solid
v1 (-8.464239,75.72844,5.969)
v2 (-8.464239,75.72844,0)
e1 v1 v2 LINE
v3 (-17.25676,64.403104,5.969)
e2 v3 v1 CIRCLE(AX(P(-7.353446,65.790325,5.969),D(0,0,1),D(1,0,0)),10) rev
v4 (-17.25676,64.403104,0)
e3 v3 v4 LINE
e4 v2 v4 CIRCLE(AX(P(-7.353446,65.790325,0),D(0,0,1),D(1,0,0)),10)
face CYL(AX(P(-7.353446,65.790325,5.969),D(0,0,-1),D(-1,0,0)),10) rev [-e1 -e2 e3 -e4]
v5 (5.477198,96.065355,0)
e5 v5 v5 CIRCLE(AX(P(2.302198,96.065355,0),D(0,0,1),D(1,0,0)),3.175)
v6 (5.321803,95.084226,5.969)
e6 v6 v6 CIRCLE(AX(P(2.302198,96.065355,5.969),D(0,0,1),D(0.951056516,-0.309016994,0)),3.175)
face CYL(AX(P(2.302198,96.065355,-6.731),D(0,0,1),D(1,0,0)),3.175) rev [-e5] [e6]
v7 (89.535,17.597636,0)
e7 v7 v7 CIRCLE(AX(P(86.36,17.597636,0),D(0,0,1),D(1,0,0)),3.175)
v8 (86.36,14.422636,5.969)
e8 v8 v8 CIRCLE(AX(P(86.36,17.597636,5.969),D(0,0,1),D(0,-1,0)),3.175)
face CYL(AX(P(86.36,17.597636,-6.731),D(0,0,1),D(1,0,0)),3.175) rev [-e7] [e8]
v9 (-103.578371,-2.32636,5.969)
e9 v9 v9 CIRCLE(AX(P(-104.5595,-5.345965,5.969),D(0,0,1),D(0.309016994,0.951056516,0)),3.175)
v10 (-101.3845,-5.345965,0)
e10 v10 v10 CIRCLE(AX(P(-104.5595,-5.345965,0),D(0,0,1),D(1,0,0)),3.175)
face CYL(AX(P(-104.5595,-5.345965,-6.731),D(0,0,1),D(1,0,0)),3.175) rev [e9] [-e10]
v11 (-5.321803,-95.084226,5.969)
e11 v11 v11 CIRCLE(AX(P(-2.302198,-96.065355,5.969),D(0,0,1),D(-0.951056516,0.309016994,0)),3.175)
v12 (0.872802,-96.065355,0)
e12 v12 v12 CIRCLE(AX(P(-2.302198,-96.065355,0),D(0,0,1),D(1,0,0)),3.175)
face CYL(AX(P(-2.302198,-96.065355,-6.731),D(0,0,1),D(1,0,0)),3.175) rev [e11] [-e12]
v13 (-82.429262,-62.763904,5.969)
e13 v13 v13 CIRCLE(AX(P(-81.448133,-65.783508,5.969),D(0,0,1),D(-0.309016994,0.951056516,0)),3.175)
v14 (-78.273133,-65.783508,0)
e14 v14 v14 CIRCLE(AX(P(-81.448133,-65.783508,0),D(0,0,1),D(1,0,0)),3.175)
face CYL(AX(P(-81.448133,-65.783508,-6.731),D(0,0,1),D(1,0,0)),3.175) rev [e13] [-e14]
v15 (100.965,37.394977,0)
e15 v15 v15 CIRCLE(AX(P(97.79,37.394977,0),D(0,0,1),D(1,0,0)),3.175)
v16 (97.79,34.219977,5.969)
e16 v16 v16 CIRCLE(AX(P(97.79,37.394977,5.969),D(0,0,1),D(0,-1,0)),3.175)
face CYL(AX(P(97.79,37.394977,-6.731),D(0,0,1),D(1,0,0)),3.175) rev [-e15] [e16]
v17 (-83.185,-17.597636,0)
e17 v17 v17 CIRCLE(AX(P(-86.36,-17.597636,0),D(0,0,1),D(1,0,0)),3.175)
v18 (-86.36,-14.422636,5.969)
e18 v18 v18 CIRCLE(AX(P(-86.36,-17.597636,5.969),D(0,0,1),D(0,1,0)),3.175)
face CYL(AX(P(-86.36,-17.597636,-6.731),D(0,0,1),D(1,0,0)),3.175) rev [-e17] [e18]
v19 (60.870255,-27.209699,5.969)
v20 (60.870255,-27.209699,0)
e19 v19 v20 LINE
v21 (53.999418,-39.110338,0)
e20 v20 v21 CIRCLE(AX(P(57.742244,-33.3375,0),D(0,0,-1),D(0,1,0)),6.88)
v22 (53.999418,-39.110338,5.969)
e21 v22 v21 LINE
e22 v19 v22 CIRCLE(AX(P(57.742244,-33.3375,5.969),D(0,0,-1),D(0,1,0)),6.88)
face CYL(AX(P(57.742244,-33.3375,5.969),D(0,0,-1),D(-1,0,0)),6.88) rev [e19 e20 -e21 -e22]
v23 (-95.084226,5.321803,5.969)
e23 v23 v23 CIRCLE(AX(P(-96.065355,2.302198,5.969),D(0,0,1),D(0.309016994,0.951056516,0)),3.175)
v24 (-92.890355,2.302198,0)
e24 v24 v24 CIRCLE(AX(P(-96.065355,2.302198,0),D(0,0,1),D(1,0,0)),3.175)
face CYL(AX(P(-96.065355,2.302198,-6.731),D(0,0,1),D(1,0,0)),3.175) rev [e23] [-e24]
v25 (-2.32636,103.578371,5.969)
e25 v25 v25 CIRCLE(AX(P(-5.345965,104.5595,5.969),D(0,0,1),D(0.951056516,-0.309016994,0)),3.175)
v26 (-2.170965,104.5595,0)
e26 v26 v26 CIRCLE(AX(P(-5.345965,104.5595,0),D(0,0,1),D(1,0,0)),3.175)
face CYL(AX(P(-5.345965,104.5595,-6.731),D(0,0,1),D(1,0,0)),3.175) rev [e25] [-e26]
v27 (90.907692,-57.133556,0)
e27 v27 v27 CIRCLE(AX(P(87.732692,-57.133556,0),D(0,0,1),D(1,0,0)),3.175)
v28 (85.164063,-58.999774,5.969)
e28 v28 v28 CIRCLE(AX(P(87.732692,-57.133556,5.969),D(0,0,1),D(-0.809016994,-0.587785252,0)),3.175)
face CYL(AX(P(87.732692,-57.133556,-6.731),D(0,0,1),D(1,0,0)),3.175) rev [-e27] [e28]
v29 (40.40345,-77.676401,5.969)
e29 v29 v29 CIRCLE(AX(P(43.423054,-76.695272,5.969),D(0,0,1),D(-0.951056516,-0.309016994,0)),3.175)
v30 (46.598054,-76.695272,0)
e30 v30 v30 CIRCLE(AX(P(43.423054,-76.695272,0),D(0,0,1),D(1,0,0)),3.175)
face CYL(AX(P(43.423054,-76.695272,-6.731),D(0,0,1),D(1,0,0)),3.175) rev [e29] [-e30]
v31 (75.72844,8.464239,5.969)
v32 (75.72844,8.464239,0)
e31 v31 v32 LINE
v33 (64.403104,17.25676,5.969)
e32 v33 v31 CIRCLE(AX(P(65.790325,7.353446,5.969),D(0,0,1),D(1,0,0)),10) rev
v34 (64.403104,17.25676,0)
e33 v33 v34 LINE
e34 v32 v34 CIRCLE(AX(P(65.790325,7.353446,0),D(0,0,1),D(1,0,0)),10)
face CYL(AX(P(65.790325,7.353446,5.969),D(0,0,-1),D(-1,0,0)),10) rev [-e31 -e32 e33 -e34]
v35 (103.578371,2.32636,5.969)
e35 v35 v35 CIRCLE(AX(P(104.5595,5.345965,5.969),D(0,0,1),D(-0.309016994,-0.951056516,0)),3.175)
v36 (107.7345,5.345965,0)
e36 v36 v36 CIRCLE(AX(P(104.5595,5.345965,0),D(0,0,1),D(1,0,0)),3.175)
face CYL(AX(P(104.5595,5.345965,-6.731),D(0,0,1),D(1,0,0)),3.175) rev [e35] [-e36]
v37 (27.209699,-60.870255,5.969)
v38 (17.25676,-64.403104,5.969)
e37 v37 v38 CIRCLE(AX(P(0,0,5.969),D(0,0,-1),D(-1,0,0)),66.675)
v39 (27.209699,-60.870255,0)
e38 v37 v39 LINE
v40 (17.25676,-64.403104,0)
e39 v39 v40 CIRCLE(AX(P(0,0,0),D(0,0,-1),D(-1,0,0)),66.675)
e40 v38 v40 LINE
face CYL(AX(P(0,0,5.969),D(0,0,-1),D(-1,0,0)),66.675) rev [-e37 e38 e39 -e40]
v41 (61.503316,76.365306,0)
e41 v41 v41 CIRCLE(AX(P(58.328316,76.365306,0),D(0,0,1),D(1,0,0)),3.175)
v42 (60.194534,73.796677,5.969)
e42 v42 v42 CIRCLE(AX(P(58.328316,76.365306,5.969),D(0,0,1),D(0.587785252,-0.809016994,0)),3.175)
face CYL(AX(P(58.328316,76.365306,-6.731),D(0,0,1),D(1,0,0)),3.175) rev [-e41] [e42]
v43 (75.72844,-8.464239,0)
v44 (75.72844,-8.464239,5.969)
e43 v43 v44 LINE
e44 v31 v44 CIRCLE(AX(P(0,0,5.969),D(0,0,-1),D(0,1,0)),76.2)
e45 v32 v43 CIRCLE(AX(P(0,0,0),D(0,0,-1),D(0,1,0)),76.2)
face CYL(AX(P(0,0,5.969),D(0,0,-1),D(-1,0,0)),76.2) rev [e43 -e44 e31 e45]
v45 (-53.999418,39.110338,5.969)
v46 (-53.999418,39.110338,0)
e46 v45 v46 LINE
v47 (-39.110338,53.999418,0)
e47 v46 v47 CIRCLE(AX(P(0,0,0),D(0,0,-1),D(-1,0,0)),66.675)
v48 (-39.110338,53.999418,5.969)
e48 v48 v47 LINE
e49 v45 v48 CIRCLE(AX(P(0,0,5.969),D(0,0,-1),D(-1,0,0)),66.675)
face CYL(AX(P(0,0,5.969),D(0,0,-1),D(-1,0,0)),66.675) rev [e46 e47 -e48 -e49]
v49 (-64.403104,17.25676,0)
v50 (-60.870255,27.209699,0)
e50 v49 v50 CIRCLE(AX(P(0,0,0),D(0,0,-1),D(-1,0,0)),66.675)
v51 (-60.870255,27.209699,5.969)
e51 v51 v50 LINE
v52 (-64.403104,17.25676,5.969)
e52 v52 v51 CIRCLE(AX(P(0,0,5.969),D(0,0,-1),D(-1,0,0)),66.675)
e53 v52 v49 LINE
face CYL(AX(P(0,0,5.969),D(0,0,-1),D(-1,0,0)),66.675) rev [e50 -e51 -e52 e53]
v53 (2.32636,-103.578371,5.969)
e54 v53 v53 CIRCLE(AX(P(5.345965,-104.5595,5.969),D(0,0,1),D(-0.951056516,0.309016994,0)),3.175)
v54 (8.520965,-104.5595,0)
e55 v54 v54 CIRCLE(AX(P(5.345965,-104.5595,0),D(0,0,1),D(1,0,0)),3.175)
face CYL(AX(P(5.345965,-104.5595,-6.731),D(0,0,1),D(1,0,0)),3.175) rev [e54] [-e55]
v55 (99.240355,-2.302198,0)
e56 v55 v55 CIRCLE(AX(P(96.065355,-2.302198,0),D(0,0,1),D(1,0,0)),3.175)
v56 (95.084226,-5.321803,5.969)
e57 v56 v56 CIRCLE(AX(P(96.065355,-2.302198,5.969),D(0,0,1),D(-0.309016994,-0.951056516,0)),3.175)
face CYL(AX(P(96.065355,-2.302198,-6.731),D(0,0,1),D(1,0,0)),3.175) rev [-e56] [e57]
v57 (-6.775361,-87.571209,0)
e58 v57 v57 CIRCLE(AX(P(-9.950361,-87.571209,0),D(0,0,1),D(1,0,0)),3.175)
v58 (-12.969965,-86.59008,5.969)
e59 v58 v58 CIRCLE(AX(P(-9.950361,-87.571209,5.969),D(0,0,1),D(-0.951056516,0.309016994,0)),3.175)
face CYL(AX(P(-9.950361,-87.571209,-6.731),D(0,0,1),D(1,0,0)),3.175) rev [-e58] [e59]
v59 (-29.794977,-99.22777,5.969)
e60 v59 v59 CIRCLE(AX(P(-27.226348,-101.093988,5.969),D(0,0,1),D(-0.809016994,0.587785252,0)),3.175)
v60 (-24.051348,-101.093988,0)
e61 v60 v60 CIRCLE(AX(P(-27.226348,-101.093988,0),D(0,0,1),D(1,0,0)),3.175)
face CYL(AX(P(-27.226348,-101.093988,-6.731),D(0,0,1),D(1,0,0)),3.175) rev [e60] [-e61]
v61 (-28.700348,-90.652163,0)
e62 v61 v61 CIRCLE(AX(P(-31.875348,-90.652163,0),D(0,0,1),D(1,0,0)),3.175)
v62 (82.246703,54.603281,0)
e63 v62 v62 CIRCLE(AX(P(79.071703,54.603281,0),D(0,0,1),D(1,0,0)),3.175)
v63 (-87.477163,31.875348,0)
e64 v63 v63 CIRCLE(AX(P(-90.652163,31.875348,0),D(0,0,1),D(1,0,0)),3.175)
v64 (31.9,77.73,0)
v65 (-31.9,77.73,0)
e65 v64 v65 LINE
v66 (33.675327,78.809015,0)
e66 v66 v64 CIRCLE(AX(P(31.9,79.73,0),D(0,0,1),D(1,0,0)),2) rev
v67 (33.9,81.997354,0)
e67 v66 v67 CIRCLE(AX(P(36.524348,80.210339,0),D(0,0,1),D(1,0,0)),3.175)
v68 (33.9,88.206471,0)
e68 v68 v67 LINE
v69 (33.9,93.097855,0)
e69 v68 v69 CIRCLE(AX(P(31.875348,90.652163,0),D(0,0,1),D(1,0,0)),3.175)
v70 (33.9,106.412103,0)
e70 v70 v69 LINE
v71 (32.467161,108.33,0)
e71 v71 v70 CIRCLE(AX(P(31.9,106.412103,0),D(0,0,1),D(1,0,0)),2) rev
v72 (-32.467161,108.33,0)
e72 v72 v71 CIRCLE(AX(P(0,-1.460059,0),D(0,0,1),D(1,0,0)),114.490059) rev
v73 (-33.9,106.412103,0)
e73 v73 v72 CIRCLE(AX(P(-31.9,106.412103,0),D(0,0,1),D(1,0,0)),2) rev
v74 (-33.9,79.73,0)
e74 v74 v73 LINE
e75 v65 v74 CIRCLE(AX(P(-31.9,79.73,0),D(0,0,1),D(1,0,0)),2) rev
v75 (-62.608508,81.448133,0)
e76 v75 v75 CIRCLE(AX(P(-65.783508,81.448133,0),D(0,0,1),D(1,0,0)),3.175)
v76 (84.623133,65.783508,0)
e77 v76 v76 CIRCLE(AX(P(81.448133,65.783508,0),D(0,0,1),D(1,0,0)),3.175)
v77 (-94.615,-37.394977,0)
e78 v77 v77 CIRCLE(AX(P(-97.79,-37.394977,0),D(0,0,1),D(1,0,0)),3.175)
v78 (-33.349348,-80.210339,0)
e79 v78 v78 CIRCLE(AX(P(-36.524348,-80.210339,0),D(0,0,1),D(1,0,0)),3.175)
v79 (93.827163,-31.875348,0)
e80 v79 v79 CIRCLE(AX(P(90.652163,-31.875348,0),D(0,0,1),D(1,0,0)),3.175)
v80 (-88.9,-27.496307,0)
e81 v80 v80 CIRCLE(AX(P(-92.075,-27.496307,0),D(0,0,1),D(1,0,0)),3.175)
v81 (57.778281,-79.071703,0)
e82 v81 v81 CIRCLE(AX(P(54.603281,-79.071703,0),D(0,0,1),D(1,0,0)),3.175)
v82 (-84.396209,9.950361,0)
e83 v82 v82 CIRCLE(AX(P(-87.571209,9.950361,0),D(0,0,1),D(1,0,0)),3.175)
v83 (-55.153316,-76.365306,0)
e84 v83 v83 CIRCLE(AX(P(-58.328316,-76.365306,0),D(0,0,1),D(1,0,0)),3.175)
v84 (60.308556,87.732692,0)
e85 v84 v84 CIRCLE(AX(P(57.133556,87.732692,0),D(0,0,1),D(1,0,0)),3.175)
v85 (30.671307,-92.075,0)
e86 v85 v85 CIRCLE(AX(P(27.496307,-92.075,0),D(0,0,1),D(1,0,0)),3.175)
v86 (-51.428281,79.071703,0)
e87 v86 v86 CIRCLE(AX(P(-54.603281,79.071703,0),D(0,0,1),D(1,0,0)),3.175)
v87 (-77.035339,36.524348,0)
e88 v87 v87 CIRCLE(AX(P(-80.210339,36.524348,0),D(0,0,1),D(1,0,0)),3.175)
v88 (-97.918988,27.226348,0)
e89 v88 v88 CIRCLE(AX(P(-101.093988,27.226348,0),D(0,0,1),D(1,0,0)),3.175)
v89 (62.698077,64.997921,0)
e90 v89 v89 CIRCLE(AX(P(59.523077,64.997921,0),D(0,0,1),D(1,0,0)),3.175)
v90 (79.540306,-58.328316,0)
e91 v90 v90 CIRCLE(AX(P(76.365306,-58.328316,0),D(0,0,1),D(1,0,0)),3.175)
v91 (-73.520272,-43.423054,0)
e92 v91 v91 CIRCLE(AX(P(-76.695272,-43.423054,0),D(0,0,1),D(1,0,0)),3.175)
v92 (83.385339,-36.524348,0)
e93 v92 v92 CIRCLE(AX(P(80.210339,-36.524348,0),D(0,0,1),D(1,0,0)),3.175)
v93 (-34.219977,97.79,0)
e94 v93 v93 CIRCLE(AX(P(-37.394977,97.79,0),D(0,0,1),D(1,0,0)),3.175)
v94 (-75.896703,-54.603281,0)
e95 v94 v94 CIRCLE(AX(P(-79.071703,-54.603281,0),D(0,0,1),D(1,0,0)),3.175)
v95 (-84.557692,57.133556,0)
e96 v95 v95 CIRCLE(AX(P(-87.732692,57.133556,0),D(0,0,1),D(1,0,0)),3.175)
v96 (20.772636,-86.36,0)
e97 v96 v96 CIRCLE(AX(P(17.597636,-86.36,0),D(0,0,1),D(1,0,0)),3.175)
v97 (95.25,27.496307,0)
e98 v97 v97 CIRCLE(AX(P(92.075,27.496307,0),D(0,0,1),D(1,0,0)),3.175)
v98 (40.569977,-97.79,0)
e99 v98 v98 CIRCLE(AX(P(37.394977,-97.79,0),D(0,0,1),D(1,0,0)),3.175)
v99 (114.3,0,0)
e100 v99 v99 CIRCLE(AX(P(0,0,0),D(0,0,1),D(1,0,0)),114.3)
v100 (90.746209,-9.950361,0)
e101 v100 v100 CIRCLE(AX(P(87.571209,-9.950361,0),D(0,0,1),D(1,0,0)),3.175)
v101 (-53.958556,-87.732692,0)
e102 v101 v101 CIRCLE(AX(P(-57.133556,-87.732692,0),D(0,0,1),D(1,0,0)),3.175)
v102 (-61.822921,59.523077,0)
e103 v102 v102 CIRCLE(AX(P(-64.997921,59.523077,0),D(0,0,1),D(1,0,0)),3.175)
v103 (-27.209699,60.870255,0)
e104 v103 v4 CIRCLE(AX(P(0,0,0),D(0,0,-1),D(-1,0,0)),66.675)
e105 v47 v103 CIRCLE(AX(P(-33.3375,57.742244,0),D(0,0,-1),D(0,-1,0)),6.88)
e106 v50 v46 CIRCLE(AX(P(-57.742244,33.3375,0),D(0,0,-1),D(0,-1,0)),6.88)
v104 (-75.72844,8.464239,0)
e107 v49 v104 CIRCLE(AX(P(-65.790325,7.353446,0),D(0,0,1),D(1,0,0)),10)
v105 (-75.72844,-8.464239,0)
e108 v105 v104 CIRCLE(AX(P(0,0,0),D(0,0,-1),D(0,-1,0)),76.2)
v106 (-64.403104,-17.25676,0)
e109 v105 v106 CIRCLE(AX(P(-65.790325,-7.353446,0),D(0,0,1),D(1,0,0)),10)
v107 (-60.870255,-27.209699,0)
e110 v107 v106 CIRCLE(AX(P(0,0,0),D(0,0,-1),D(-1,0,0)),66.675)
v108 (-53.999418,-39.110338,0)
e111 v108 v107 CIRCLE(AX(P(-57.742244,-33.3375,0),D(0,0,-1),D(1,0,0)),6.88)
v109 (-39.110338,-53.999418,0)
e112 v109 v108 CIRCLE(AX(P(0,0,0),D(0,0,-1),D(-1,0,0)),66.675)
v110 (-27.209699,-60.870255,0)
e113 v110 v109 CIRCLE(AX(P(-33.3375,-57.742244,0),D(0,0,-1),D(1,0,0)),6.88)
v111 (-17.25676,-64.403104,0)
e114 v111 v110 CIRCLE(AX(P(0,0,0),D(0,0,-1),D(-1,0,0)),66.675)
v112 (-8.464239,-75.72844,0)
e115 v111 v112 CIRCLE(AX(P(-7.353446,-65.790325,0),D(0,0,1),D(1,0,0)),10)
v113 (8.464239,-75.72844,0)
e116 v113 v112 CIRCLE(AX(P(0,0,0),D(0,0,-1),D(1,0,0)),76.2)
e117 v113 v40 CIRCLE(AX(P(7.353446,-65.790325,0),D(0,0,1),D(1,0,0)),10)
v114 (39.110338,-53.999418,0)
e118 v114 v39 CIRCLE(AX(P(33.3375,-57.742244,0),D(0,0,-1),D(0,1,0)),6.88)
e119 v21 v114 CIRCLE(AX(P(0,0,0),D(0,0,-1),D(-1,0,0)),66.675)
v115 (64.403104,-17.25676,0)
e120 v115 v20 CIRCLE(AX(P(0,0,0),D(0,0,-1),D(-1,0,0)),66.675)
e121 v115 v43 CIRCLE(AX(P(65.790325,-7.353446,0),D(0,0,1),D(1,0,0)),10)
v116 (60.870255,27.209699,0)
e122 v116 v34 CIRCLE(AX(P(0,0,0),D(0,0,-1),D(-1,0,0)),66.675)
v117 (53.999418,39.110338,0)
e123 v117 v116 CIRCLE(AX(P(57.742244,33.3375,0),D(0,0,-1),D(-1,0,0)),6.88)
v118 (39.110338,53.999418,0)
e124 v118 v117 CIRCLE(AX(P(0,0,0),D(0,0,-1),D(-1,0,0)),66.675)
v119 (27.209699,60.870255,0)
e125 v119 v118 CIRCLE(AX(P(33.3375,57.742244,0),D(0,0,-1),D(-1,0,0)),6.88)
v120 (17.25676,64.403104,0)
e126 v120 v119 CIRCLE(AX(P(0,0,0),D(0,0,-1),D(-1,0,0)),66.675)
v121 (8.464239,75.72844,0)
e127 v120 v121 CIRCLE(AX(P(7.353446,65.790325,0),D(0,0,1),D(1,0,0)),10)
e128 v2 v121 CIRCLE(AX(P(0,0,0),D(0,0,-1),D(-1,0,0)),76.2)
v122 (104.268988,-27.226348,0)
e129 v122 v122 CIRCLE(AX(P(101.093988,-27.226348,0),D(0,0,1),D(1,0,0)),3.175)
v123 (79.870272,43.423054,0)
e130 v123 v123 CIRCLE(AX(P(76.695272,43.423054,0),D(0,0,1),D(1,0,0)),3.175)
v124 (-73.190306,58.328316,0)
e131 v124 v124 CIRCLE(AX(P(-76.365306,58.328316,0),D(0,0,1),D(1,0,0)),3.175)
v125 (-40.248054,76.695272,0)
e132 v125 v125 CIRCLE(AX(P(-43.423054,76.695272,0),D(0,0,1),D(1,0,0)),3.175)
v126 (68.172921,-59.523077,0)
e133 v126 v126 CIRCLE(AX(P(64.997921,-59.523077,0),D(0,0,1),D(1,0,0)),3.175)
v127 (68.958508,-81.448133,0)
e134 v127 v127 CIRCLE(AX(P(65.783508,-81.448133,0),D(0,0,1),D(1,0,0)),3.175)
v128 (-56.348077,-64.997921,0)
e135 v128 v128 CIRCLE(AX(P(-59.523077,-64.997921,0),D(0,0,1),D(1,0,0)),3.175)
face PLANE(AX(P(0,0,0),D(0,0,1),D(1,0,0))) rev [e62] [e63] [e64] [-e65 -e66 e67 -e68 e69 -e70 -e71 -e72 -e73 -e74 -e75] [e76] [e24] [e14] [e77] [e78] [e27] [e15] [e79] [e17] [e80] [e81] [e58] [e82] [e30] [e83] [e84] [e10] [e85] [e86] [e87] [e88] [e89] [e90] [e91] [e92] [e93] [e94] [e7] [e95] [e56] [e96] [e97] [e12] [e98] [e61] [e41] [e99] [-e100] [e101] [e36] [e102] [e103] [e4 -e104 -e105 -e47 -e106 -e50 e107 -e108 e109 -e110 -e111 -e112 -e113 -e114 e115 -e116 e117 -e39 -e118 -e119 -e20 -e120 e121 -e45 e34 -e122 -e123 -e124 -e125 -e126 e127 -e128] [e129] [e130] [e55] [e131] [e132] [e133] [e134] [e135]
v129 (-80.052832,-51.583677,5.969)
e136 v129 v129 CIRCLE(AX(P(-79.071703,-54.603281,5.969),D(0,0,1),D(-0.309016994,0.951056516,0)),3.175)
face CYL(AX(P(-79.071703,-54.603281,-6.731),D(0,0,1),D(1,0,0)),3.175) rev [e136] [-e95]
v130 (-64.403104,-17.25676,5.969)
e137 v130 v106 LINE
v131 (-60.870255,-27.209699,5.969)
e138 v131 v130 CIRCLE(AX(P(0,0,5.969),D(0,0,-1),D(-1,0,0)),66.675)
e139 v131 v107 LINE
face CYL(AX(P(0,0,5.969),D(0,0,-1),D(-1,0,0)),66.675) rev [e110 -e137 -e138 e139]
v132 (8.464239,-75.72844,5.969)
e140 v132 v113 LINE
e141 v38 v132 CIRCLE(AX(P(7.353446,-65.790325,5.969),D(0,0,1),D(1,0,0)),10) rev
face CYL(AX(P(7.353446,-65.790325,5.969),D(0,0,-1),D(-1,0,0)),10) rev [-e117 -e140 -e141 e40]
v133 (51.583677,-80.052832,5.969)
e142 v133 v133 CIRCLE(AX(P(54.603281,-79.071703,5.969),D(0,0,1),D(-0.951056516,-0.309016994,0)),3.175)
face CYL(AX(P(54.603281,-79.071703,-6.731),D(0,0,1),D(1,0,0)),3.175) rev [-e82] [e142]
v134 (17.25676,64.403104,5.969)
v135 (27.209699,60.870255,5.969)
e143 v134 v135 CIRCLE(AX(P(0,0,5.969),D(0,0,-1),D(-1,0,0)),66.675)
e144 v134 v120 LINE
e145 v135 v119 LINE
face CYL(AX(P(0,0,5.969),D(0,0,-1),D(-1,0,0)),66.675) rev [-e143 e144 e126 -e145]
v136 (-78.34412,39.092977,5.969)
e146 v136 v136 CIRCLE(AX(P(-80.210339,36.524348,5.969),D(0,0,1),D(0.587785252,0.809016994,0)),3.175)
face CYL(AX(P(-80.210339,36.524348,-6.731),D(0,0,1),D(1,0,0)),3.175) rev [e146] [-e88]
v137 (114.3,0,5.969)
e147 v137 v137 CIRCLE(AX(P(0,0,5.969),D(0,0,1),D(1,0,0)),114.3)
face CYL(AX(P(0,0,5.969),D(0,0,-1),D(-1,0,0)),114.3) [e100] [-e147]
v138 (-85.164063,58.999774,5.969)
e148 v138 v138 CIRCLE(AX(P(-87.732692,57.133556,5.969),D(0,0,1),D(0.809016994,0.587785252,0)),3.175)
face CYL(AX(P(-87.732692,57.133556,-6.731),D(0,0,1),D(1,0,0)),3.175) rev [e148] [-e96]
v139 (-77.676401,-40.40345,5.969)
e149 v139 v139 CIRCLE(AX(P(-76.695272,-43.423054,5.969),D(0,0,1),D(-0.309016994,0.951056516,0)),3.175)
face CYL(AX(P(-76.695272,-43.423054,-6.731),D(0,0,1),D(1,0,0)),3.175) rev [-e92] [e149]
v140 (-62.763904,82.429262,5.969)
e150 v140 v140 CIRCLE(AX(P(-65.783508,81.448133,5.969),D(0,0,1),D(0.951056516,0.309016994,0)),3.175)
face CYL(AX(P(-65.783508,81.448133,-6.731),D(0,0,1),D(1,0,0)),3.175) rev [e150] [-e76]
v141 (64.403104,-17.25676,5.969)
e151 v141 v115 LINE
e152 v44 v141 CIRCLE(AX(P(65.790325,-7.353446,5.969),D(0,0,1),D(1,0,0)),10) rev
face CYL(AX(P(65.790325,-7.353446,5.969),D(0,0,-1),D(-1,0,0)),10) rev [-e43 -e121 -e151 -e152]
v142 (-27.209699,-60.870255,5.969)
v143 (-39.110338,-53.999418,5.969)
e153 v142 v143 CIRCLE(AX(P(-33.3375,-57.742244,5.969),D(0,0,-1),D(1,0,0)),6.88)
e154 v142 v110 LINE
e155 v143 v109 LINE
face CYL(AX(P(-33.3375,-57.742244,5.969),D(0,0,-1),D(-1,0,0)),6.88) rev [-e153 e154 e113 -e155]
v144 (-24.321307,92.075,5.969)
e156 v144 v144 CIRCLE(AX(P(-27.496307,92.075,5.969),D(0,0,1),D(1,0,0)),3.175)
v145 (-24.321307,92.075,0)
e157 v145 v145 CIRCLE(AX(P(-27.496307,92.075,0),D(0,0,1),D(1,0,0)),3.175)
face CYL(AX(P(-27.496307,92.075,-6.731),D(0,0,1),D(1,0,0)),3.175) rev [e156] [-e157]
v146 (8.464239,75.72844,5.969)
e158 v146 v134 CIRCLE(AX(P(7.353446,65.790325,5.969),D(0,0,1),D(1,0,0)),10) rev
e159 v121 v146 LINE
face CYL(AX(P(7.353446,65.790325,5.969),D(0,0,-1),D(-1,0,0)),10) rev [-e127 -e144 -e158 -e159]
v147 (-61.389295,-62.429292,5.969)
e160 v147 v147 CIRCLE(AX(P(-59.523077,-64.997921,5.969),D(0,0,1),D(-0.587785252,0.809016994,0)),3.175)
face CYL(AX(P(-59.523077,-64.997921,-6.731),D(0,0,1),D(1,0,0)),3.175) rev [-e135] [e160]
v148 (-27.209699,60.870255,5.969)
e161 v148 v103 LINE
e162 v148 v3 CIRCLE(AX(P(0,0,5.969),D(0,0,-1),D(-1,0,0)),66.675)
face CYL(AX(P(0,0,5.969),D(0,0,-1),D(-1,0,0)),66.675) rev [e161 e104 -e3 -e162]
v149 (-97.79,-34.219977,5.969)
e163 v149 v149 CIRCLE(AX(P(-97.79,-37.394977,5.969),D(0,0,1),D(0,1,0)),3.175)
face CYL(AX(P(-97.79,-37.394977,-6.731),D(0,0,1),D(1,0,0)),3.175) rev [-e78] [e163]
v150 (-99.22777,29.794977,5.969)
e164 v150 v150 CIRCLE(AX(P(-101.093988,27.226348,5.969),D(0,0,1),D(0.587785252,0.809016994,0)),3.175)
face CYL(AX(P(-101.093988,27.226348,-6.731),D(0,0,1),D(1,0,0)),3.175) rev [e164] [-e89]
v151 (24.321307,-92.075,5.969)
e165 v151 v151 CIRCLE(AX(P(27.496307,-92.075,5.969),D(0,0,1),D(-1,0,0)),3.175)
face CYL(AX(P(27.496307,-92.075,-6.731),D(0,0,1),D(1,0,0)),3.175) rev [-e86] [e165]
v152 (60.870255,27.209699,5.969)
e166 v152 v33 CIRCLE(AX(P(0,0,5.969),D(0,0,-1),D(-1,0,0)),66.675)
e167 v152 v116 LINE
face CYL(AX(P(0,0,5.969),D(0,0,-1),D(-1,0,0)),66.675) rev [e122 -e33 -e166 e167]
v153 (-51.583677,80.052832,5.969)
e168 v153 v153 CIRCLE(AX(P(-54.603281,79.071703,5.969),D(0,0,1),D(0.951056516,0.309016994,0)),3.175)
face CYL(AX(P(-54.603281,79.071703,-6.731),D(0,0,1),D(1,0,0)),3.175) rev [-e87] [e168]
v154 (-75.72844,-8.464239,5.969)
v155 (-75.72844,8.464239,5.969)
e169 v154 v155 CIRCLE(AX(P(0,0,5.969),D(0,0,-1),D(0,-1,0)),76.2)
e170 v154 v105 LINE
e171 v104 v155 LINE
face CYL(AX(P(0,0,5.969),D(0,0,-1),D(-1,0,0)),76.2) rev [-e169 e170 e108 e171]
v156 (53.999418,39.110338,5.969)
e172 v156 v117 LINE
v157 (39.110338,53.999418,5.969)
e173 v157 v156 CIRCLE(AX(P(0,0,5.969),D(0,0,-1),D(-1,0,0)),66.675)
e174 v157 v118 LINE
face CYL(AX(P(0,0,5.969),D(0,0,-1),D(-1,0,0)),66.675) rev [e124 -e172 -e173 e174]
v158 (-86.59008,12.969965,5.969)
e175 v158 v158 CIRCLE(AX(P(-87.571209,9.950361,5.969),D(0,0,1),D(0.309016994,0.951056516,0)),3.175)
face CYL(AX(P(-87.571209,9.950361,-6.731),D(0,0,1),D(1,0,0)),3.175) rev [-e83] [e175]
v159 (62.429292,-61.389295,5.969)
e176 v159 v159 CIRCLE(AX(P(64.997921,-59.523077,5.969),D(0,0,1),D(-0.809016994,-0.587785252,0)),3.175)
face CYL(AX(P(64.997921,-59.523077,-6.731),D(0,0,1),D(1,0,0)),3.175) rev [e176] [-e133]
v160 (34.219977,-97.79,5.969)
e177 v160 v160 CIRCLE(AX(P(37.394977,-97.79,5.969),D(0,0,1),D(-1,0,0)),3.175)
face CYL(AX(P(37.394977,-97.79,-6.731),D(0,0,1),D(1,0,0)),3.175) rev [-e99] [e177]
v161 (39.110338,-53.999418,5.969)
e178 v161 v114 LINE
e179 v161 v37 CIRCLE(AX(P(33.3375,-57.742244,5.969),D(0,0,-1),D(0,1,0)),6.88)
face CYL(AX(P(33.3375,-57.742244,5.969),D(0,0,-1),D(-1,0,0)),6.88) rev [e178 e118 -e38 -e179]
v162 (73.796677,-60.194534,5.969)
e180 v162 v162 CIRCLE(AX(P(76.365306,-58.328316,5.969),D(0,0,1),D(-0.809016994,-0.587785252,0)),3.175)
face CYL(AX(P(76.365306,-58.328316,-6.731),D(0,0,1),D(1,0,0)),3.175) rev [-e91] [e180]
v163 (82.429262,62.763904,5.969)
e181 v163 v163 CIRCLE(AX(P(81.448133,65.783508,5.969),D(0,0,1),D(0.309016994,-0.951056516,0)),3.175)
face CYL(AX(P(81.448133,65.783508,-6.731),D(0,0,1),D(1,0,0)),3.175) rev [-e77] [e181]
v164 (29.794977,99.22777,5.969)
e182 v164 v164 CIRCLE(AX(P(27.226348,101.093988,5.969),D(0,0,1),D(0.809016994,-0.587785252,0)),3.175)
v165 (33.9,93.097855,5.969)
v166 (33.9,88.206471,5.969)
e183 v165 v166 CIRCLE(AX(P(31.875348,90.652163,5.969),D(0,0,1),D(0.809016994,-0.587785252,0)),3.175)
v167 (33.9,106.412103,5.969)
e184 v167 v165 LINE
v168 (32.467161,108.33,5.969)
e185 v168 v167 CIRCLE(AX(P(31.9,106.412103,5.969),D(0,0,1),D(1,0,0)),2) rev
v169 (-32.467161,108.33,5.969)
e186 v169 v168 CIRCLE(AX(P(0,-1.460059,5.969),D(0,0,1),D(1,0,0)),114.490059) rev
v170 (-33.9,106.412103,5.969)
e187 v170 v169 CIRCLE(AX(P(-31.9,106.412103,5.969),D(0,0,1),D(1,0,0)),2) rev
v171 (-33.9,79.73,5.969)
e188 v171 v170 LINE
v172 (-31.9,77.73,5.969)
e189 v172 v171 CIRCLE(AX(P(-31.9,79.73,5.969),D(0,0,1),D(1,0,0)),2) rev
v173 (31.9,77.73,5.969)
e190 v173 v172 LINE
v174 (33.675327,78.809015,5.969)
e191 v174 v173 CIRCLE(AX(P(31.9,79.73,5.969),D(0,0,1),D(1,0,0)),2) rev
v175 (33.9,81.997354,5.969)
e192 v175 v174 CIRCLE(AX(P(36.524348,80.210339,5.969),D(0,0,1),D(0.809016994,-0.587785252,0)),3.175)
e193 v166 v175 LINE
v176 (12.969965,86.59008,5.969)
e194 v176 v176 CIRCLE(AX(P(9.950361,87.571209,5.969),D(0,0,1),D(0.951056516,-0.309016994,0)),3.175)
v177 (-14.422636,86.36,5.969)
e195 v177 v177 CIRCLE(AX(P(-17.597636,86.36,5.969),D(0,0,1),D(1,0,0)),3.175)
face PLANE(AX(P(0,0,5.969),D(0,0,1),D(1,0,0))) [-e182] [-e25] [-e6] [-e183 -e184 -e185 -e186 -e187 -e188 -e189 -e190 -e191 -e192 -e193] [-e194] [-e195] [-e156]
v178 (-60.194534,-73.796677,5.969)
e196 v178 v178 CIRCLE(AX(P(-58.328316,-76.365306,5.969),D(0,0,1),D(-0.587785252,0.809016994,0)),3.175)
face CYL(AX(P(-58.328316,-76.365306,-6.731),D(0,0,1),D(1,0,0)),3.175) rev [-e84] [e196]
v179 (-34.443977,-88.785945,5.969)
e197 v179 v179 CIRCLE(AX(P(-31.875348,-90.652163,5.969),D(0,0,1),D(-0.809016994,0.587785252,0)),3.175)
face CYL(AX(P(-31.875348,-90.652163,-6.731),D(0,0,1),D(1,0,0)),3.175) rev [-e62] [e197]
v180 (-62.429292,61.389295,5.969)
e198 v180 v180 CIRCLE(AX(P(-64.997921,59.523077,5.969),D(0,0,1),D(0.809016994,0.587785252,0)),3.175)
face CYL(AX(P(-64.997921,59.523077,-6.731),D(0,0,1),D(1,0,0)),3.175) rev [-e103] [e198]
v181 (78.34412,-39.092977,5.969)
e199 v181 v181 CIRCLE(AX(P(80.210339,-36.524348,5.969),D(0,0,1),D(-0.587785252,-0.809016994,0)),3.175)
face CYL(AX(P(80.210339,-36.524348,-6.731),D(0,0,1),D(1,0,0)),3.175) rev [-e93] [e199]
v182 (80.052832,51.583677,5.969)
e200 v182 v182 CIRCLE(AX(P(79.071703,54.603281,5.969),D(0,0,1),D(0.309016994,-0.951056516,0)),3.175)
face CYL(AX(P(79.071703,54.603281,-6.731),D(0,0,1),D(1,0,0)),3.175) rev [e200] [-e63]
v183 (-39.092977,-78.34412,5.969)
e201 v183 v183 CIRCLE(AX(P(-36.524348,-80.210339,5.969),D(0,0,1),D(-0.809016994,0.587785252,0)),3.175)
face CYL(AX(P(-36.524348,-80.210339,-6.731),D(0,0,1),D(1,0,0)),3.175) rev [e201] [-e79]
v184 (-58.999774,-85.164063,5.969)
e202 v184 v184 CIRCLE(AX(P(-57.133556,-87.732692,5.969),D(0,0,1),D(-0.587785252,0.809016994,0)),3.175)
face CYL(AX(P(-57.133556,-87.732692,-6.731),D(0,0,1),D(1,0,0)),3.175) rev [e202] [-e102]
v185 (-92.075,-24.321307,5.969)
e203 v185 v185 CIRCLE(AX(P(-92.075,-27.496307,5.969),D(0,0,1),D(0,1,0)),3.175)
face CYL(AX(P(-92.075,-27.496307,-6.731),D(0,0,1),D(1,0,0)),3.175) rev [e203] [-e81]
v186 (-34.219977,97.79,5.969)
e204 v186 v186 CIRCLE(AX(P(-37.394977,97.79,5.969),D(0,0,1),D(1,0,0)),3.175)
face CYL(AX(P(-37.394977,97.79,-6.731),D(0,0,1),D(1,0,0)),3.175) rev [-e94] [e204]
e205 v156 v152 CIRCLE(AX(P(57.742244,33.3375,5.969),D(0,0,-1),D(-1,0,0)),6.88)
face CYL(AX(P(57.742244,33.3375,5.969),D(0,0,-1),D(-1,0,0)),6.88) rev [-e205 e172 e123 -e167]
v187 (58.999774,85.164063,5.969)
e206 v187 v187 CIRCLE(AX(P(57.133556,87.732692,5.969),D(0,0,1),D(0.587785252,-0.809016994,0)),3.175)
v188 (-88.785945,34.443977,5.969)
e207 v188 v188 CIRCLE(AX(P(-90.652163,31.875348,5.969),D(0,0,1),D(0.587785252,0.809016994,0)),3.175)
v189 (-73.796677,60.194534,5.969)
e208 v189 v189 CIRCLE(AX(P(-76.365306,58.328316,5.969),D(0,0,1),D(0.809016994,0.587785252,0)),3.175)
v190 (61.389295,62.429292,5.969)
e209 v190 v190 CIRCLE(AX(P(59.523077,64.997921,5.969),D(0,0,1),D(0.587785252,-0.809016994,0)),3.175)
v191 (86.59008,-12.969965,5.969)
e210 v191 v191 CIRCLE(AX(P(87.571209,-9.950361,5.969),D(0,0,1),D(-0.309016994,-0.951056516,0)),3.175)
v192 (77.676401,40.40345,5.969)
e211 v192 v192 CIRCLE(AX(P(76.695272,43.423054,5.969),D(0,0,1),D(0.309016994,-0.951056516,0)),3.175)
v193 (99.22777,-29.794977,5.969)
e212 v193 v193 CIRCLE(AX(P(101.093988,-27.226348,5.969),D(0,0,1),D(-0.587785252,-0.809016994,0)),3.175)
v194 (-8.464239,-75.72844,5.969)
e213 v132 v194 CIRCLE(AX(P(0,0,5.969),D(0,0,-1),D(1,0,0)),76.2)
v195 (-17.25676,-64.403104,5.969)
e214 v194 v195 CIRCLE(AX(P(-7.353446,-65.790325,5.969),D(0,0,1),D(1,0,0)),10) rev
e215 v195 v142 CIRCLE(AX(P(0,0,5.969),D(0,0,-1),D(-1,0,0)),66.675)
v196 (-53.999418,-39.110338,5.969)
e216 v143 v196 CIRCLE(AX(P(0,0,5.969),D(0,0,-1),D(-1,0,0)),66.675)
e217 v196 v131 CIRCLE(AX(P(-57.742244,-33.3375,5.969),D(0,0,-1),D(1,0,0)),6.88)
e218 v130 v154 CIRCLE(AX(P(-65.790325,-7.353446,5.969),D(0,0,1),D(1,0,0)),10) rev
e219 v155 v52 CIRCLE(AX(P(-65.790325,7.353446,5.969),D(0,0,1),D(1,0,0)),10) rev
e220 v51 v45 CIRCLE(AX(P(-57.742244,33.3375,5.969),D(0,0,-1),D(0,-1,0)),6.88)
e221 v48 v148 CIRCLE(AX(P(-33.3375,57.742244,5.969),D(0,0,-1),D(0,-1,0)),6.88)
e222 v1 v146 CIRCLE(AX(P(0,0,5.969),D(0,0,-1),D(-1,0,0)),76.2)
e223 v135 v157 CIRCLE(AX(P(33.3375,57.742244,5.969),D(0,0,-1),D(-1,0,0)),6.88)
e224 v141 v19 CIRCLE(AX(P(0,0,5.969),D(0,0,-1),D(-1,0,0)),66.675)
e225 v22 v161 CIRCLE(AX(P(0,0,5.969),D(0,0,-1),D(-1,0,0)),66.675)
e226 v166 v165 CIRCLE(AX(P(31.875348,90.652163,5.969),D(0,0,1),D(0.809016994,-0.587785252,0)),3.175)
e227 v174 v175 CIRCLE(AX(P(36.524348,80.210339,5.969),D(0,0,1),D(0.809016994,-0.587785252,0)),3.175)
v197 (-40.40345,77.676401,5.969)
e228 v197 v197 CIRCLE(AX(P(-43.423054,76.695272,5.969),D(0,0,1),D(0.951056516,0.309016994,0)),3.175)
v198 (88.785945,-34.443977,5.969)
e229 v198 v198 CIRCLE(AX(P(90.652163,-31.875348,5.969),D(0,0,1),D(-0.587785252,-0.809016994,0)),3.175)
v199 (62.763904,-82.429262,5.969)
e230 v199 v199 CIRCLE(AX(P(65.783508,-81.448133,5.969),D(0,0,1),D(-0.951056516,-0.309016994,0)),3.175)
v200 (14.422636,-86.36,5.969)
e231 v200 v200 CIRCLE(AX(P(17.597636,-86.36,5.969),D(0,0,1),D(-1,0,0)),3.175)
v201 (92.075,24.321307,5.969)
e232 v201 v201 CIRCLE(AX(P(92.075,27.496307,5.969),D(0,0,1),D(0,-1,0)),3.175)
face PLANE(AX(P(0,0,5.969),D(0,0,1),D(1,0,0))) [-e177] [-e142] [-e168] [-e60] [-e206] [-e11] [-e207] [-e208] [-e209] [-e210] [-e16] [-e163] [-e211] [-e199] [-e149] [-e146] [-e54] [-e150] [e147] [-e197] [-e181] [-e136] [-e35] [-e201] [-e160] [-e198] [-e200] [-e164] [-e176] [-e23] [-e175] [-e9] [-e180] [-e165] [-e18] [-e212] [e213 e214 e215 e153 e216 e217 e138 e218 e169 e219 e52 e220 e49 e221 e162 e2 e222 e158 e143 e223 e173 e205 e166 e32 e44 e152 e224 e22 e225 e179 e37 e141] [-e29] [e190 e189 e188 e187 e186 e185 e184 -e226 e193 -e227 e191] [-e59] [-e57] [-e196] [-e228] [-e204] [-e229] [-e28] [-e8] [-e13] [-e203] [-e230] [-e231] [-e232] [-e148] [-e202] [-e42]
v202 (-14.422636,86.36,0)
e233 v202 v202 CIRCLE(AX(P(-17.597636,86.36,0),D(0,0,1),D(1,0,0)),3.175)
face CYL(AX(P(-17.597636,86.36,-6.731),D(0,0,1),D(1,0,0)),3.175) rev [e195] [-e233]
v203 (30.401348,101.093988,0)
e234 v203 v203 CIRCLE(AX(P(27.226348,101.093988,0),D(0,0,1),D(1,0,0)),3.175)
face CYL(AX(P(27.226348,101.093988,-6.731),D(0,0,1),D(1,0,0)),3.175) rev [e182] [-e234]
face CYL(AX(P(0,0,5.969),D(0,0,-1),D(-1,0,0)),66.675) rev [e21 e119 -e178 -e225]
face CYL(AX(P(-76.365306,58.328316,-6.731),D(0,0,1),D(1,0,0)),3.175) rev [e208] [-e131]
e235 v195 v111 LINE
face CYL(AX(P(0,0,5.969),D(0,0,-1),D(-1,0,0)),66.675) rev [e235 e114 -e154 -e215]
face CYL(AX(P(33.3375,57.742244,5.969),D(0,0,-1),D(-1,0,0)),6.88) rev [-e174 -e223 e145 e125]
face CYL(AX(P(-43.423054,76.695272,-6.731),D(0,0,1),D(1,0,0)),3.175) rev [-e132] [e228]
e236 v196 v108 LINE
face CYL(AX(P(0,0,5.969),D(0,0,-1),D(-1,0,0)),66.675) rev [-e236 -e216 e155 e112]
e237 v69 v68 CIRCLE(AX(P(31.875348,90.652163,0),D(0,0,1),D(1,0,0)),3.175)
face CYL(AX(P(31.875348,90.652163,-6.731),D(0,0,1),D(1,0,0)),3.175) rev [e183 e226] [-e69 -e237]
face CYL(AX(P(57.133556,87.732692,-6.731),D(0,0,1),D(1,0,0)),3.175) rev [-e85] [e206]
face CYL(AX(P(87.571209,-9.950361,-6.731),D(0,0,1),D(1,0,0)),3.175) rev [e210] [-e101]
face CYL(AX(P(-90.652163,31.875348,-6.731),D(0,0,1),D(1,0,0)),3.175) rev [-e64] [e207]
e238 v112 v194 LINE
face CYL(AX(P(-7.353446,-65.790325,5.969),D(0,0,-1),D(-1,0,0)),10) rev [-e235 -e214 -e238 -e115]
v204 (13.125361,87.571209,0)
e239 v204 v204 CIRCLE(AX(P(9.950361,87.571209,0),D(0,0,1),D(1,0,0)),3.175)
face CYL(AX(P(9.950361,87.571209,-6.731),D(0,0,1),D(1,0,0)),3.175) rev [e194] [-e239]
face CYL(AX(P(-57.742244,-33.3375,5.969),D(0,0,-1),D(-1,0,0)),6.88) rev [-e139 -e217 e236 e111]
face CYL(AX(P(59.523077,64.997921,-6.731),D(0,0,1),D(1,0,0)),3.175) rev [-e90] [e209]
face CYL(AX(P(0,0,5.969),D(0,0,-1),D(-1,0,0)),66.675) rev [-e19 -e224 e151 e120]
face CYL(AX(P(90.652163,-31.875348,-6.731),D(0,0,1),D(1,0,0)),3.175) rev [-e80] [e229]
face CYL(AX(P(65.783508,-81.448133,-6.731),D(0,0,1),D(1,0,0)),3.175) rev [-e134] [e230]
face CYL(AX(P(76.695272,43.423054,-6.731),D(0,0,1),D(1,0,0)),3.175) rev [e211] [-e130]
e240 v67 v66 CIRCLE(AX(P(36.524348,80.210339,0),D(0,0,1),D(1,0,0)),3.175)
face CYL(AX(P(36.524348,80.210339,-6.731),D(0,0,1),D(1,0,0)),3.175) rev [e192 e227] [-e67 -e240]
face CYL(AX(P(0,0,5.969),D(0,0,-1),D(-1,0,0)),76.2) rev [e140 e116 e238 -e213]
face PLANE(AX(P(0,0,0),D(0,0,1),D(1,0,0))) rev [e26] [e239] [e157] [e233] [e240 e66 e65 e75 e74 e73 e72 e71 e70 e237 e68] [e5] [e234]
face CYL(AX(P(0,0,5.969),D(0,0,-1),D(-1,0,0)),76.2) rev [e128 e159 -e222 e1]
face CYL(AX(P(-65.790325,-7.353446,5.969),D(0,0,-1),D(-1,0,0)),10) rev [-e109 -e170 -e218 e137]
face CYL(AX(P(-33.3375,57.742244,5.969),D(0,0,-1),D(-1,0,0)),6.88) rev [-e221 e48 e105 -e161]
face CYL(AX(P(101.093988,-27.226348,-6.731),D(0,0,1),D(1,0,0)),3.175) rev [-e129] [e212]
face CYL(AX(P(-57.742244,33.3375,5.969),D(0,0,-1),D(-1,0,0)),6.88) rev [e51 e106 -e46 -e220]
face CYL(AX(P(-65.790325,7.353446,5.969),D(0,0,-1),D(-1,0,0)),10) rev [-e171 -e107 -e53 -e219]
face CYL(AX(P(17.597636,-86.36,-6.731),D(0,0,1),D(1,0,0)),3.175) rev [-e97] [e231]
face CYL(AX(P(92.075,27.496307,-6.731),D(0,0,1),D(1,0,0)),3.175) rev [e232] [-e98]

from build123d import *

# Parameters (mm, degrees)
SKETCH1_R                 = 114.3
SKETCH1_R_2               = 76.2
BOSS_EXTRUDE1_DEPTH       = 5.969
SKETCH2_R                 = 3.175
CUT_EXTRUDE1_DEPTH        = 12.7
CIRPATTERN5_COUNT         = 20
SKETCH9_R                 = 4.5
BOSS_EXTRUDE4_DEPTH       = 5.969
FILLET1_R                 = 6.35
CIRPATTERN8_COUNT         = 5
FILLET1_OF_CIRPATTERN8_R  = 6.35
SKETCH14_R                = 76.2
SKETCH14_R_2              = 34.925
BOSS_EXTRUDE6_DEPTH       = 5.969
SKETCH16_R                = 4.5
CUT_EXTRUDE3_DEPTH        = 5.969
CIRPATTERN9_COUNT         = 5
SKETCH17_R                = 66.675
SKETCH17_R_2              = 6.88
CUT_EXTRUDE4_DEPTH        = 5.969
CIRPATTERN10_COUNT        = 4
CUT_EXTRUDE6_DEPTH        = 162.754780334
FILLET2_R                 = 10
CIRPATTERN11_COUNT        = 4
FILLET2_OF_CIRPATTERN11_R = 10


with BuildPart() as part:
    # Sketch1 → Boss-Extrude1 (new body)
    with BuildSketch(Plane.XY):
        Circle(SKETCH1_R)
        Circle(SKETCH1_R_2, mode=Mode.SUBTRACT)
    extrude(amount=BOSS_EXTRUDE1_DEPTH)

    # Sketch2 → Cut-Extrude1 (cut)
    with BuildSketch(Plane.XY.offset(5.969)):
        with Locations((-37.394976935, 97.79)):
            Circle(SKETCH2_R)
        with Locations((-27.49630657, 92.075)):
            Circle(SKETCH2_R)
        with Locations((-17.597636205, 86.36)):
            Circle(SKETCH2_R)
    cut_extrude1 = extrude(amount=-CUT_EXTRUDE1_DEPTH, mode=Mode.SUBTRACT)

    # CirPattern5: Cut-Extrude1 ×20 about axis
    cirpattern5_axis = Axis((0, 0, 0), (0, 0, 1))
    for i in range(1, CIRPATTERN5_COUNT):
        add(cut_extrude1.rotate(cirpattern5_axis, i * 360 / CIRPATTERN5_COUNT), mode=Mode.SUBTRACT)

    # Sketch9 → Boss-Extrude4 (add)
    with BuildSketch(Plane(origin=(0, 0, 0), x_dir=(-1, 0, 0), z_dir=(0, 0, -1))):
        with BuildLine():
            Line((7.427010516, 41.456201743), (12.172412147, 75.221488835))
            ThreePointArc((12.172412147, 75.221488835), (0, 76.2), (-12.172412147, 75.221488835))
            Line((-12.172412147, 75.221488835), (-7.427010516, 41.456201743))
            ThreePointArc((-7.427010516, 41.456201743), (0, 35), (7.427010516, 41.456201743))
        make_face()
        with Locations((0, 42.5)):
            Circle(SKETCH9_R, mode=Mode.SUBTRACT)
    boss_extrude4 = extrude(amount=-BOSS_EXTRUDE4_DEPTH)

    # Fillet1
    fillet1_edges = [part.edges().sort_by_distance(p)[0] for p in [
        (12.172412147, 75.221488835, 2.9845),
        (-12.172412147, 75.221488835, 2.9845),
    ]]
    fillet(fillet1_edges, radius=FILLET1_R)

    # CirPattern8: Boss-Extrude4 ×5 about axis
    cirpattern8_axis = Axis((0, 0, 0), (0, 0, 1))
    for i in range(1, CIRPATTERN8_COUNT):
        add(boss_extrude4.rotate(cirpattern8_axis, i * 360 / CIRPATTERN8_COUNT))

    # Fillet1 of CirPattern8
    fillet1_of_cirpattern8_edges = [part.edges().sort_by_distance(p)[0] for p in [
        (-67.778404906, 34.821370284, 2.9845),
        (-75.301369338, 11.6680665, 2.9845),
        (-54.061770082, -53.700698464, 2.9845),
        (-34.366393503, -68.010227155, 2.9845),
        (34.366393503, -68.010227155, 2.9845),
        (54.061770082, -53.700698464, 2.9845),
        (75.301369338, 11.6680665, 2.9845),
        (67.778404906, 34.821370284, 2.9845),
    ]]
    fillet(fillet1_of_cirpattern8_edges, radius=FILLET1_OF_CIRPATTERN8_R)

    # Sketch14 → Boss-Extrude6 (add)
    with BuildSketch(Plane.XY):
        Circle(SKETCH14_R)
        Circle(SKETCH14_R_2, mode=Mode.SUBTRACT)
    extrude(amount=BOSS_EXTRUDE6_DEPTH)

    # Sketch16 → Cut-Extrude3 (cut)
    with BuildSketch(Plane.XY):
        with Locations((0, 42.5)):
            Circle(SKETCH16_R)
    cut_extrude3 = extrude(amount=CUT_EXTRUDE3_DEPTH, mode=Mode.SUBTRACT)

    # CirPattern9: Cut-Extrude3 ×5 about axis
    cirpattern9_axis = Axis((0, 0, 0), (0, 0, 1))
    for i in range(1, CIRPATTERN9_COUNT):
        add(cut_extrude3.rotate(cirpattern9_axis, i * 360 / CIRPATTERN9_COUNT), mode=Mode.SUBTRACT)

    # Sketch17 → Cut-Extrude4 (cut)
    with BuildSketch(Plane(origin=(0, 0, 0), x_dir=(-1, 0, 0), z_dir=(0, 0, -1))):
        Circle(SKETCH17_R)
        with Locations((-33.3375, 57.742243797)):
            Circle(SKETCH17_R_2)
        with Locations((-57.742243797, 33.3375)):
            Circle(SKETCH17_R_2)
    cut_extrude4 = extrude(amount=-CUT_EXTRUDE4_DEPTH, mode=Mode.SUBTRACT)

    # CirPattern10: Cut-Extrude4 ×4 about axis
    cirpattern10_axis = Axis((0, 0, 0), (0, 0, 1))
    for i in range(1, CIRPATTERN10_COUNT):
        add(cut_extrude4.rotate(cirpattern10_axis, i * 360 / CIRPATTERN10_COUNT), mode=Mode.SUBTRACT)

    # Sketch19 → Cut-Extrude6 (cut, through all)
    with BuildSketch(Plane(origin=(0, 0, 0), x_dir=(-1, 0, 0), z_dir=(0, 0, -1))):
        with BuildLine():
            Line((-19.722011237, 73.603547963), (-17.256759832, 64.403104468))
            ThreePointArc((-17.256759832, 64.403104468), (-8.702833866, 66.104586132), (0, 66.675))
            Line((0, 66.675), (0, 76.2))
            ThreePointArc((0, 76.2), (-9.946095847, 75.548098437), (-19.722011237, 73.603547963))
        make_face()
        with BuildLine():
            ThreePointArc((0, 66.675), (8.702833866, 66.104586132), (17.256759832, 64.403104468))
            Line((17.256759832, 64.403104468), (19.722011237, 73.603547963))
            ThreePointArc((19.722011237, 73.603547963), (9.946095847, 75.548098437), (0, 76.2))
            Line((0, 76.2), (0, 66.675))
        make_face()
    cut_extrude6 = extrude(amount=-CUT_EXTRUDE6_DEPTH, mode=Mode.SUBTRACT)

    # Fillet2
    # the kernel refuses this fillet: 10 mm, written as the material it adds along each edge
    with BuildSketch(Plane(origin=(-19.722011237, 73.603547963, 0), x_dir=(0.982649179352288, 0.18547396129450383, 0), z_dir=(0, 0, 1))) as fillet2_piece_1:
        with BuildLine():
            CenterArc((10.704810772, -9.971704141), FILLET2_R, 85.688766621, 91.596368931)
            Line((0.716034569, -9.498048194), (0.516259045, -9.488575075))
            ThreePointArc((0.516259045, -9.488575075), (0.158583202, -4.764058944), (-0.199434083, -0.015034847))
            Line((-0.199434083, -0.015034847), (-0.015034847, 0.199434083))
            ThreePointArc((-0.015034847, 0.199434083), (5.728276551, 0.415614448), (11.471587949, 0.199434083))
            Line((11.471587949, 0.199434083), (11.456553102, 0))
        make_face()
    extrude(amount=5.969)
    with BuildSketch(Plane(origin=(19.722011237, 73.603547963, 0), x_dir=(-0.2588190451025574, -0.9659258262890585, 0), z_dir=(0, 0, 1))) as fillet2_piece_2:
        with BuildLine():
            CenterArc((10.748214286, -9.92490538), FILLET2_R, 97.026097827, 91.596368931)
            Line((0.861237592, -11.4241358), (0.663498058, -11.454120409))
            ThreePointArc((0.663498058, -11.454120409), (0.016180365, -5.743311398), (-0.2, 0))
            Line((-0.2, 0), (0, 0.2))
            ThreePointArc((0, 0.2), (4.7625, 0.2), (9.500535714, 0.198498108))
            Line((9.500535714, 0.198498108), (9.525, 0))
        make_face()
    extrude(amount=5.969)

    # CirPattern11: Cut-Extrude6 ×4 about axis
    cirpattern11_axis = Axis((0, 0, 0), (0, 0, 1))
    for i in range(1, CIRPATTERN11_COUNT):
        add(cut_extrude6.rotate(cirpattern11_axis, i * 360 / CIRPATTERN11_COUNT), mode=Mode.SUBTRACT)

    # Fillet2 of CirPattern11
    # the kernel refuses this fillet: 10 mm, written as the material it adds along each edge
    with BuildSketch(Plane(origin=(-73.603547963, -19.722011237, 0), x_dir=(0.9659258262890572, 0.2588190451025623, 0), z_dir=(0, 0, 1)), Plane(origin=(19.722011237, -73.603547963, 0), x_dir=(-0.2588190451025616, 0.9659258262890574, 0), z_dir=(0, 0, 1)), Plane(origin=(73.603547963, 19.722011237, 0), x_dir=(-0.9659258262890574, -0.2588190451025616, 0), z_dir=(0, 0, 1))) as fillet2_of_cirpattern11_piece_1:
        with BuildLine():
            CenterArc((10.748214286, 9.92490538), FILLET2_OF_CIRPATTERN11_R, 171.377533242, 91.596368931)
            Line((0.861237592, 11.4241358), (0.663498058, 11.454120409))
            ThreePointArc((0.663498058, 11.454120409), (0.016180365, 5.743311398), (-0.2, 0))
            Line((-0.2, 0), (0, -0.2))
            ThreePointArc((0, -0.2), (4.7625, -0.2), (9.500535714, -0.198498108))
            Line((9.500535714, -0.198498108), (9.525, 0))
        make_face()
    extrude(amount=5.969)
    with BuildSketch(Plane(origin=(-73.603547963, 19.722011237, 0), x_dir=(-0.18547396129450153, -0.9826491793522883, 0), z_dir=(0, 0, 1)), Plane(origin=(-19.722011237, -73.603547963, 0), x_dir=(0.9826491793522883, -0.18547396129450153, 0), z_dir=(0, 0, 1)), Plane(origin=(73.603547963, -19.722011237, 0), x_dir=(0.18547396129450147, 0.9826491793522883, 0), z_dir=(0, 0, 1))) as fillet2_of_cirpattern11_piece_2:
        with BuildLine():
            CenterArc((10.704810772, 9.971704141), FILLET2_OF_CIRPATTERN11_R, 182.714864448, 91.596368931)
            Line((0.716034569, 9.498048194), (0.516259045, 9.488575075))
            ThreePointArc((0.516259045, 9.488575075), (0.158583202, 4.764058944), (-0.199434083, 0.015034847))
            Line((-0.199434083, 0.015034847), (-0.015034847, -0.199434083))
            ThreePointArc((-0.015034847, -0.199434083), (5.728276551, -0.415614448), (11.471587949, -0.199434083))
            Line((11.471587949, -0.199434083), (11.456553102, 0))
        make_face()
    extrude(amount=5.969)


solid = part.part
